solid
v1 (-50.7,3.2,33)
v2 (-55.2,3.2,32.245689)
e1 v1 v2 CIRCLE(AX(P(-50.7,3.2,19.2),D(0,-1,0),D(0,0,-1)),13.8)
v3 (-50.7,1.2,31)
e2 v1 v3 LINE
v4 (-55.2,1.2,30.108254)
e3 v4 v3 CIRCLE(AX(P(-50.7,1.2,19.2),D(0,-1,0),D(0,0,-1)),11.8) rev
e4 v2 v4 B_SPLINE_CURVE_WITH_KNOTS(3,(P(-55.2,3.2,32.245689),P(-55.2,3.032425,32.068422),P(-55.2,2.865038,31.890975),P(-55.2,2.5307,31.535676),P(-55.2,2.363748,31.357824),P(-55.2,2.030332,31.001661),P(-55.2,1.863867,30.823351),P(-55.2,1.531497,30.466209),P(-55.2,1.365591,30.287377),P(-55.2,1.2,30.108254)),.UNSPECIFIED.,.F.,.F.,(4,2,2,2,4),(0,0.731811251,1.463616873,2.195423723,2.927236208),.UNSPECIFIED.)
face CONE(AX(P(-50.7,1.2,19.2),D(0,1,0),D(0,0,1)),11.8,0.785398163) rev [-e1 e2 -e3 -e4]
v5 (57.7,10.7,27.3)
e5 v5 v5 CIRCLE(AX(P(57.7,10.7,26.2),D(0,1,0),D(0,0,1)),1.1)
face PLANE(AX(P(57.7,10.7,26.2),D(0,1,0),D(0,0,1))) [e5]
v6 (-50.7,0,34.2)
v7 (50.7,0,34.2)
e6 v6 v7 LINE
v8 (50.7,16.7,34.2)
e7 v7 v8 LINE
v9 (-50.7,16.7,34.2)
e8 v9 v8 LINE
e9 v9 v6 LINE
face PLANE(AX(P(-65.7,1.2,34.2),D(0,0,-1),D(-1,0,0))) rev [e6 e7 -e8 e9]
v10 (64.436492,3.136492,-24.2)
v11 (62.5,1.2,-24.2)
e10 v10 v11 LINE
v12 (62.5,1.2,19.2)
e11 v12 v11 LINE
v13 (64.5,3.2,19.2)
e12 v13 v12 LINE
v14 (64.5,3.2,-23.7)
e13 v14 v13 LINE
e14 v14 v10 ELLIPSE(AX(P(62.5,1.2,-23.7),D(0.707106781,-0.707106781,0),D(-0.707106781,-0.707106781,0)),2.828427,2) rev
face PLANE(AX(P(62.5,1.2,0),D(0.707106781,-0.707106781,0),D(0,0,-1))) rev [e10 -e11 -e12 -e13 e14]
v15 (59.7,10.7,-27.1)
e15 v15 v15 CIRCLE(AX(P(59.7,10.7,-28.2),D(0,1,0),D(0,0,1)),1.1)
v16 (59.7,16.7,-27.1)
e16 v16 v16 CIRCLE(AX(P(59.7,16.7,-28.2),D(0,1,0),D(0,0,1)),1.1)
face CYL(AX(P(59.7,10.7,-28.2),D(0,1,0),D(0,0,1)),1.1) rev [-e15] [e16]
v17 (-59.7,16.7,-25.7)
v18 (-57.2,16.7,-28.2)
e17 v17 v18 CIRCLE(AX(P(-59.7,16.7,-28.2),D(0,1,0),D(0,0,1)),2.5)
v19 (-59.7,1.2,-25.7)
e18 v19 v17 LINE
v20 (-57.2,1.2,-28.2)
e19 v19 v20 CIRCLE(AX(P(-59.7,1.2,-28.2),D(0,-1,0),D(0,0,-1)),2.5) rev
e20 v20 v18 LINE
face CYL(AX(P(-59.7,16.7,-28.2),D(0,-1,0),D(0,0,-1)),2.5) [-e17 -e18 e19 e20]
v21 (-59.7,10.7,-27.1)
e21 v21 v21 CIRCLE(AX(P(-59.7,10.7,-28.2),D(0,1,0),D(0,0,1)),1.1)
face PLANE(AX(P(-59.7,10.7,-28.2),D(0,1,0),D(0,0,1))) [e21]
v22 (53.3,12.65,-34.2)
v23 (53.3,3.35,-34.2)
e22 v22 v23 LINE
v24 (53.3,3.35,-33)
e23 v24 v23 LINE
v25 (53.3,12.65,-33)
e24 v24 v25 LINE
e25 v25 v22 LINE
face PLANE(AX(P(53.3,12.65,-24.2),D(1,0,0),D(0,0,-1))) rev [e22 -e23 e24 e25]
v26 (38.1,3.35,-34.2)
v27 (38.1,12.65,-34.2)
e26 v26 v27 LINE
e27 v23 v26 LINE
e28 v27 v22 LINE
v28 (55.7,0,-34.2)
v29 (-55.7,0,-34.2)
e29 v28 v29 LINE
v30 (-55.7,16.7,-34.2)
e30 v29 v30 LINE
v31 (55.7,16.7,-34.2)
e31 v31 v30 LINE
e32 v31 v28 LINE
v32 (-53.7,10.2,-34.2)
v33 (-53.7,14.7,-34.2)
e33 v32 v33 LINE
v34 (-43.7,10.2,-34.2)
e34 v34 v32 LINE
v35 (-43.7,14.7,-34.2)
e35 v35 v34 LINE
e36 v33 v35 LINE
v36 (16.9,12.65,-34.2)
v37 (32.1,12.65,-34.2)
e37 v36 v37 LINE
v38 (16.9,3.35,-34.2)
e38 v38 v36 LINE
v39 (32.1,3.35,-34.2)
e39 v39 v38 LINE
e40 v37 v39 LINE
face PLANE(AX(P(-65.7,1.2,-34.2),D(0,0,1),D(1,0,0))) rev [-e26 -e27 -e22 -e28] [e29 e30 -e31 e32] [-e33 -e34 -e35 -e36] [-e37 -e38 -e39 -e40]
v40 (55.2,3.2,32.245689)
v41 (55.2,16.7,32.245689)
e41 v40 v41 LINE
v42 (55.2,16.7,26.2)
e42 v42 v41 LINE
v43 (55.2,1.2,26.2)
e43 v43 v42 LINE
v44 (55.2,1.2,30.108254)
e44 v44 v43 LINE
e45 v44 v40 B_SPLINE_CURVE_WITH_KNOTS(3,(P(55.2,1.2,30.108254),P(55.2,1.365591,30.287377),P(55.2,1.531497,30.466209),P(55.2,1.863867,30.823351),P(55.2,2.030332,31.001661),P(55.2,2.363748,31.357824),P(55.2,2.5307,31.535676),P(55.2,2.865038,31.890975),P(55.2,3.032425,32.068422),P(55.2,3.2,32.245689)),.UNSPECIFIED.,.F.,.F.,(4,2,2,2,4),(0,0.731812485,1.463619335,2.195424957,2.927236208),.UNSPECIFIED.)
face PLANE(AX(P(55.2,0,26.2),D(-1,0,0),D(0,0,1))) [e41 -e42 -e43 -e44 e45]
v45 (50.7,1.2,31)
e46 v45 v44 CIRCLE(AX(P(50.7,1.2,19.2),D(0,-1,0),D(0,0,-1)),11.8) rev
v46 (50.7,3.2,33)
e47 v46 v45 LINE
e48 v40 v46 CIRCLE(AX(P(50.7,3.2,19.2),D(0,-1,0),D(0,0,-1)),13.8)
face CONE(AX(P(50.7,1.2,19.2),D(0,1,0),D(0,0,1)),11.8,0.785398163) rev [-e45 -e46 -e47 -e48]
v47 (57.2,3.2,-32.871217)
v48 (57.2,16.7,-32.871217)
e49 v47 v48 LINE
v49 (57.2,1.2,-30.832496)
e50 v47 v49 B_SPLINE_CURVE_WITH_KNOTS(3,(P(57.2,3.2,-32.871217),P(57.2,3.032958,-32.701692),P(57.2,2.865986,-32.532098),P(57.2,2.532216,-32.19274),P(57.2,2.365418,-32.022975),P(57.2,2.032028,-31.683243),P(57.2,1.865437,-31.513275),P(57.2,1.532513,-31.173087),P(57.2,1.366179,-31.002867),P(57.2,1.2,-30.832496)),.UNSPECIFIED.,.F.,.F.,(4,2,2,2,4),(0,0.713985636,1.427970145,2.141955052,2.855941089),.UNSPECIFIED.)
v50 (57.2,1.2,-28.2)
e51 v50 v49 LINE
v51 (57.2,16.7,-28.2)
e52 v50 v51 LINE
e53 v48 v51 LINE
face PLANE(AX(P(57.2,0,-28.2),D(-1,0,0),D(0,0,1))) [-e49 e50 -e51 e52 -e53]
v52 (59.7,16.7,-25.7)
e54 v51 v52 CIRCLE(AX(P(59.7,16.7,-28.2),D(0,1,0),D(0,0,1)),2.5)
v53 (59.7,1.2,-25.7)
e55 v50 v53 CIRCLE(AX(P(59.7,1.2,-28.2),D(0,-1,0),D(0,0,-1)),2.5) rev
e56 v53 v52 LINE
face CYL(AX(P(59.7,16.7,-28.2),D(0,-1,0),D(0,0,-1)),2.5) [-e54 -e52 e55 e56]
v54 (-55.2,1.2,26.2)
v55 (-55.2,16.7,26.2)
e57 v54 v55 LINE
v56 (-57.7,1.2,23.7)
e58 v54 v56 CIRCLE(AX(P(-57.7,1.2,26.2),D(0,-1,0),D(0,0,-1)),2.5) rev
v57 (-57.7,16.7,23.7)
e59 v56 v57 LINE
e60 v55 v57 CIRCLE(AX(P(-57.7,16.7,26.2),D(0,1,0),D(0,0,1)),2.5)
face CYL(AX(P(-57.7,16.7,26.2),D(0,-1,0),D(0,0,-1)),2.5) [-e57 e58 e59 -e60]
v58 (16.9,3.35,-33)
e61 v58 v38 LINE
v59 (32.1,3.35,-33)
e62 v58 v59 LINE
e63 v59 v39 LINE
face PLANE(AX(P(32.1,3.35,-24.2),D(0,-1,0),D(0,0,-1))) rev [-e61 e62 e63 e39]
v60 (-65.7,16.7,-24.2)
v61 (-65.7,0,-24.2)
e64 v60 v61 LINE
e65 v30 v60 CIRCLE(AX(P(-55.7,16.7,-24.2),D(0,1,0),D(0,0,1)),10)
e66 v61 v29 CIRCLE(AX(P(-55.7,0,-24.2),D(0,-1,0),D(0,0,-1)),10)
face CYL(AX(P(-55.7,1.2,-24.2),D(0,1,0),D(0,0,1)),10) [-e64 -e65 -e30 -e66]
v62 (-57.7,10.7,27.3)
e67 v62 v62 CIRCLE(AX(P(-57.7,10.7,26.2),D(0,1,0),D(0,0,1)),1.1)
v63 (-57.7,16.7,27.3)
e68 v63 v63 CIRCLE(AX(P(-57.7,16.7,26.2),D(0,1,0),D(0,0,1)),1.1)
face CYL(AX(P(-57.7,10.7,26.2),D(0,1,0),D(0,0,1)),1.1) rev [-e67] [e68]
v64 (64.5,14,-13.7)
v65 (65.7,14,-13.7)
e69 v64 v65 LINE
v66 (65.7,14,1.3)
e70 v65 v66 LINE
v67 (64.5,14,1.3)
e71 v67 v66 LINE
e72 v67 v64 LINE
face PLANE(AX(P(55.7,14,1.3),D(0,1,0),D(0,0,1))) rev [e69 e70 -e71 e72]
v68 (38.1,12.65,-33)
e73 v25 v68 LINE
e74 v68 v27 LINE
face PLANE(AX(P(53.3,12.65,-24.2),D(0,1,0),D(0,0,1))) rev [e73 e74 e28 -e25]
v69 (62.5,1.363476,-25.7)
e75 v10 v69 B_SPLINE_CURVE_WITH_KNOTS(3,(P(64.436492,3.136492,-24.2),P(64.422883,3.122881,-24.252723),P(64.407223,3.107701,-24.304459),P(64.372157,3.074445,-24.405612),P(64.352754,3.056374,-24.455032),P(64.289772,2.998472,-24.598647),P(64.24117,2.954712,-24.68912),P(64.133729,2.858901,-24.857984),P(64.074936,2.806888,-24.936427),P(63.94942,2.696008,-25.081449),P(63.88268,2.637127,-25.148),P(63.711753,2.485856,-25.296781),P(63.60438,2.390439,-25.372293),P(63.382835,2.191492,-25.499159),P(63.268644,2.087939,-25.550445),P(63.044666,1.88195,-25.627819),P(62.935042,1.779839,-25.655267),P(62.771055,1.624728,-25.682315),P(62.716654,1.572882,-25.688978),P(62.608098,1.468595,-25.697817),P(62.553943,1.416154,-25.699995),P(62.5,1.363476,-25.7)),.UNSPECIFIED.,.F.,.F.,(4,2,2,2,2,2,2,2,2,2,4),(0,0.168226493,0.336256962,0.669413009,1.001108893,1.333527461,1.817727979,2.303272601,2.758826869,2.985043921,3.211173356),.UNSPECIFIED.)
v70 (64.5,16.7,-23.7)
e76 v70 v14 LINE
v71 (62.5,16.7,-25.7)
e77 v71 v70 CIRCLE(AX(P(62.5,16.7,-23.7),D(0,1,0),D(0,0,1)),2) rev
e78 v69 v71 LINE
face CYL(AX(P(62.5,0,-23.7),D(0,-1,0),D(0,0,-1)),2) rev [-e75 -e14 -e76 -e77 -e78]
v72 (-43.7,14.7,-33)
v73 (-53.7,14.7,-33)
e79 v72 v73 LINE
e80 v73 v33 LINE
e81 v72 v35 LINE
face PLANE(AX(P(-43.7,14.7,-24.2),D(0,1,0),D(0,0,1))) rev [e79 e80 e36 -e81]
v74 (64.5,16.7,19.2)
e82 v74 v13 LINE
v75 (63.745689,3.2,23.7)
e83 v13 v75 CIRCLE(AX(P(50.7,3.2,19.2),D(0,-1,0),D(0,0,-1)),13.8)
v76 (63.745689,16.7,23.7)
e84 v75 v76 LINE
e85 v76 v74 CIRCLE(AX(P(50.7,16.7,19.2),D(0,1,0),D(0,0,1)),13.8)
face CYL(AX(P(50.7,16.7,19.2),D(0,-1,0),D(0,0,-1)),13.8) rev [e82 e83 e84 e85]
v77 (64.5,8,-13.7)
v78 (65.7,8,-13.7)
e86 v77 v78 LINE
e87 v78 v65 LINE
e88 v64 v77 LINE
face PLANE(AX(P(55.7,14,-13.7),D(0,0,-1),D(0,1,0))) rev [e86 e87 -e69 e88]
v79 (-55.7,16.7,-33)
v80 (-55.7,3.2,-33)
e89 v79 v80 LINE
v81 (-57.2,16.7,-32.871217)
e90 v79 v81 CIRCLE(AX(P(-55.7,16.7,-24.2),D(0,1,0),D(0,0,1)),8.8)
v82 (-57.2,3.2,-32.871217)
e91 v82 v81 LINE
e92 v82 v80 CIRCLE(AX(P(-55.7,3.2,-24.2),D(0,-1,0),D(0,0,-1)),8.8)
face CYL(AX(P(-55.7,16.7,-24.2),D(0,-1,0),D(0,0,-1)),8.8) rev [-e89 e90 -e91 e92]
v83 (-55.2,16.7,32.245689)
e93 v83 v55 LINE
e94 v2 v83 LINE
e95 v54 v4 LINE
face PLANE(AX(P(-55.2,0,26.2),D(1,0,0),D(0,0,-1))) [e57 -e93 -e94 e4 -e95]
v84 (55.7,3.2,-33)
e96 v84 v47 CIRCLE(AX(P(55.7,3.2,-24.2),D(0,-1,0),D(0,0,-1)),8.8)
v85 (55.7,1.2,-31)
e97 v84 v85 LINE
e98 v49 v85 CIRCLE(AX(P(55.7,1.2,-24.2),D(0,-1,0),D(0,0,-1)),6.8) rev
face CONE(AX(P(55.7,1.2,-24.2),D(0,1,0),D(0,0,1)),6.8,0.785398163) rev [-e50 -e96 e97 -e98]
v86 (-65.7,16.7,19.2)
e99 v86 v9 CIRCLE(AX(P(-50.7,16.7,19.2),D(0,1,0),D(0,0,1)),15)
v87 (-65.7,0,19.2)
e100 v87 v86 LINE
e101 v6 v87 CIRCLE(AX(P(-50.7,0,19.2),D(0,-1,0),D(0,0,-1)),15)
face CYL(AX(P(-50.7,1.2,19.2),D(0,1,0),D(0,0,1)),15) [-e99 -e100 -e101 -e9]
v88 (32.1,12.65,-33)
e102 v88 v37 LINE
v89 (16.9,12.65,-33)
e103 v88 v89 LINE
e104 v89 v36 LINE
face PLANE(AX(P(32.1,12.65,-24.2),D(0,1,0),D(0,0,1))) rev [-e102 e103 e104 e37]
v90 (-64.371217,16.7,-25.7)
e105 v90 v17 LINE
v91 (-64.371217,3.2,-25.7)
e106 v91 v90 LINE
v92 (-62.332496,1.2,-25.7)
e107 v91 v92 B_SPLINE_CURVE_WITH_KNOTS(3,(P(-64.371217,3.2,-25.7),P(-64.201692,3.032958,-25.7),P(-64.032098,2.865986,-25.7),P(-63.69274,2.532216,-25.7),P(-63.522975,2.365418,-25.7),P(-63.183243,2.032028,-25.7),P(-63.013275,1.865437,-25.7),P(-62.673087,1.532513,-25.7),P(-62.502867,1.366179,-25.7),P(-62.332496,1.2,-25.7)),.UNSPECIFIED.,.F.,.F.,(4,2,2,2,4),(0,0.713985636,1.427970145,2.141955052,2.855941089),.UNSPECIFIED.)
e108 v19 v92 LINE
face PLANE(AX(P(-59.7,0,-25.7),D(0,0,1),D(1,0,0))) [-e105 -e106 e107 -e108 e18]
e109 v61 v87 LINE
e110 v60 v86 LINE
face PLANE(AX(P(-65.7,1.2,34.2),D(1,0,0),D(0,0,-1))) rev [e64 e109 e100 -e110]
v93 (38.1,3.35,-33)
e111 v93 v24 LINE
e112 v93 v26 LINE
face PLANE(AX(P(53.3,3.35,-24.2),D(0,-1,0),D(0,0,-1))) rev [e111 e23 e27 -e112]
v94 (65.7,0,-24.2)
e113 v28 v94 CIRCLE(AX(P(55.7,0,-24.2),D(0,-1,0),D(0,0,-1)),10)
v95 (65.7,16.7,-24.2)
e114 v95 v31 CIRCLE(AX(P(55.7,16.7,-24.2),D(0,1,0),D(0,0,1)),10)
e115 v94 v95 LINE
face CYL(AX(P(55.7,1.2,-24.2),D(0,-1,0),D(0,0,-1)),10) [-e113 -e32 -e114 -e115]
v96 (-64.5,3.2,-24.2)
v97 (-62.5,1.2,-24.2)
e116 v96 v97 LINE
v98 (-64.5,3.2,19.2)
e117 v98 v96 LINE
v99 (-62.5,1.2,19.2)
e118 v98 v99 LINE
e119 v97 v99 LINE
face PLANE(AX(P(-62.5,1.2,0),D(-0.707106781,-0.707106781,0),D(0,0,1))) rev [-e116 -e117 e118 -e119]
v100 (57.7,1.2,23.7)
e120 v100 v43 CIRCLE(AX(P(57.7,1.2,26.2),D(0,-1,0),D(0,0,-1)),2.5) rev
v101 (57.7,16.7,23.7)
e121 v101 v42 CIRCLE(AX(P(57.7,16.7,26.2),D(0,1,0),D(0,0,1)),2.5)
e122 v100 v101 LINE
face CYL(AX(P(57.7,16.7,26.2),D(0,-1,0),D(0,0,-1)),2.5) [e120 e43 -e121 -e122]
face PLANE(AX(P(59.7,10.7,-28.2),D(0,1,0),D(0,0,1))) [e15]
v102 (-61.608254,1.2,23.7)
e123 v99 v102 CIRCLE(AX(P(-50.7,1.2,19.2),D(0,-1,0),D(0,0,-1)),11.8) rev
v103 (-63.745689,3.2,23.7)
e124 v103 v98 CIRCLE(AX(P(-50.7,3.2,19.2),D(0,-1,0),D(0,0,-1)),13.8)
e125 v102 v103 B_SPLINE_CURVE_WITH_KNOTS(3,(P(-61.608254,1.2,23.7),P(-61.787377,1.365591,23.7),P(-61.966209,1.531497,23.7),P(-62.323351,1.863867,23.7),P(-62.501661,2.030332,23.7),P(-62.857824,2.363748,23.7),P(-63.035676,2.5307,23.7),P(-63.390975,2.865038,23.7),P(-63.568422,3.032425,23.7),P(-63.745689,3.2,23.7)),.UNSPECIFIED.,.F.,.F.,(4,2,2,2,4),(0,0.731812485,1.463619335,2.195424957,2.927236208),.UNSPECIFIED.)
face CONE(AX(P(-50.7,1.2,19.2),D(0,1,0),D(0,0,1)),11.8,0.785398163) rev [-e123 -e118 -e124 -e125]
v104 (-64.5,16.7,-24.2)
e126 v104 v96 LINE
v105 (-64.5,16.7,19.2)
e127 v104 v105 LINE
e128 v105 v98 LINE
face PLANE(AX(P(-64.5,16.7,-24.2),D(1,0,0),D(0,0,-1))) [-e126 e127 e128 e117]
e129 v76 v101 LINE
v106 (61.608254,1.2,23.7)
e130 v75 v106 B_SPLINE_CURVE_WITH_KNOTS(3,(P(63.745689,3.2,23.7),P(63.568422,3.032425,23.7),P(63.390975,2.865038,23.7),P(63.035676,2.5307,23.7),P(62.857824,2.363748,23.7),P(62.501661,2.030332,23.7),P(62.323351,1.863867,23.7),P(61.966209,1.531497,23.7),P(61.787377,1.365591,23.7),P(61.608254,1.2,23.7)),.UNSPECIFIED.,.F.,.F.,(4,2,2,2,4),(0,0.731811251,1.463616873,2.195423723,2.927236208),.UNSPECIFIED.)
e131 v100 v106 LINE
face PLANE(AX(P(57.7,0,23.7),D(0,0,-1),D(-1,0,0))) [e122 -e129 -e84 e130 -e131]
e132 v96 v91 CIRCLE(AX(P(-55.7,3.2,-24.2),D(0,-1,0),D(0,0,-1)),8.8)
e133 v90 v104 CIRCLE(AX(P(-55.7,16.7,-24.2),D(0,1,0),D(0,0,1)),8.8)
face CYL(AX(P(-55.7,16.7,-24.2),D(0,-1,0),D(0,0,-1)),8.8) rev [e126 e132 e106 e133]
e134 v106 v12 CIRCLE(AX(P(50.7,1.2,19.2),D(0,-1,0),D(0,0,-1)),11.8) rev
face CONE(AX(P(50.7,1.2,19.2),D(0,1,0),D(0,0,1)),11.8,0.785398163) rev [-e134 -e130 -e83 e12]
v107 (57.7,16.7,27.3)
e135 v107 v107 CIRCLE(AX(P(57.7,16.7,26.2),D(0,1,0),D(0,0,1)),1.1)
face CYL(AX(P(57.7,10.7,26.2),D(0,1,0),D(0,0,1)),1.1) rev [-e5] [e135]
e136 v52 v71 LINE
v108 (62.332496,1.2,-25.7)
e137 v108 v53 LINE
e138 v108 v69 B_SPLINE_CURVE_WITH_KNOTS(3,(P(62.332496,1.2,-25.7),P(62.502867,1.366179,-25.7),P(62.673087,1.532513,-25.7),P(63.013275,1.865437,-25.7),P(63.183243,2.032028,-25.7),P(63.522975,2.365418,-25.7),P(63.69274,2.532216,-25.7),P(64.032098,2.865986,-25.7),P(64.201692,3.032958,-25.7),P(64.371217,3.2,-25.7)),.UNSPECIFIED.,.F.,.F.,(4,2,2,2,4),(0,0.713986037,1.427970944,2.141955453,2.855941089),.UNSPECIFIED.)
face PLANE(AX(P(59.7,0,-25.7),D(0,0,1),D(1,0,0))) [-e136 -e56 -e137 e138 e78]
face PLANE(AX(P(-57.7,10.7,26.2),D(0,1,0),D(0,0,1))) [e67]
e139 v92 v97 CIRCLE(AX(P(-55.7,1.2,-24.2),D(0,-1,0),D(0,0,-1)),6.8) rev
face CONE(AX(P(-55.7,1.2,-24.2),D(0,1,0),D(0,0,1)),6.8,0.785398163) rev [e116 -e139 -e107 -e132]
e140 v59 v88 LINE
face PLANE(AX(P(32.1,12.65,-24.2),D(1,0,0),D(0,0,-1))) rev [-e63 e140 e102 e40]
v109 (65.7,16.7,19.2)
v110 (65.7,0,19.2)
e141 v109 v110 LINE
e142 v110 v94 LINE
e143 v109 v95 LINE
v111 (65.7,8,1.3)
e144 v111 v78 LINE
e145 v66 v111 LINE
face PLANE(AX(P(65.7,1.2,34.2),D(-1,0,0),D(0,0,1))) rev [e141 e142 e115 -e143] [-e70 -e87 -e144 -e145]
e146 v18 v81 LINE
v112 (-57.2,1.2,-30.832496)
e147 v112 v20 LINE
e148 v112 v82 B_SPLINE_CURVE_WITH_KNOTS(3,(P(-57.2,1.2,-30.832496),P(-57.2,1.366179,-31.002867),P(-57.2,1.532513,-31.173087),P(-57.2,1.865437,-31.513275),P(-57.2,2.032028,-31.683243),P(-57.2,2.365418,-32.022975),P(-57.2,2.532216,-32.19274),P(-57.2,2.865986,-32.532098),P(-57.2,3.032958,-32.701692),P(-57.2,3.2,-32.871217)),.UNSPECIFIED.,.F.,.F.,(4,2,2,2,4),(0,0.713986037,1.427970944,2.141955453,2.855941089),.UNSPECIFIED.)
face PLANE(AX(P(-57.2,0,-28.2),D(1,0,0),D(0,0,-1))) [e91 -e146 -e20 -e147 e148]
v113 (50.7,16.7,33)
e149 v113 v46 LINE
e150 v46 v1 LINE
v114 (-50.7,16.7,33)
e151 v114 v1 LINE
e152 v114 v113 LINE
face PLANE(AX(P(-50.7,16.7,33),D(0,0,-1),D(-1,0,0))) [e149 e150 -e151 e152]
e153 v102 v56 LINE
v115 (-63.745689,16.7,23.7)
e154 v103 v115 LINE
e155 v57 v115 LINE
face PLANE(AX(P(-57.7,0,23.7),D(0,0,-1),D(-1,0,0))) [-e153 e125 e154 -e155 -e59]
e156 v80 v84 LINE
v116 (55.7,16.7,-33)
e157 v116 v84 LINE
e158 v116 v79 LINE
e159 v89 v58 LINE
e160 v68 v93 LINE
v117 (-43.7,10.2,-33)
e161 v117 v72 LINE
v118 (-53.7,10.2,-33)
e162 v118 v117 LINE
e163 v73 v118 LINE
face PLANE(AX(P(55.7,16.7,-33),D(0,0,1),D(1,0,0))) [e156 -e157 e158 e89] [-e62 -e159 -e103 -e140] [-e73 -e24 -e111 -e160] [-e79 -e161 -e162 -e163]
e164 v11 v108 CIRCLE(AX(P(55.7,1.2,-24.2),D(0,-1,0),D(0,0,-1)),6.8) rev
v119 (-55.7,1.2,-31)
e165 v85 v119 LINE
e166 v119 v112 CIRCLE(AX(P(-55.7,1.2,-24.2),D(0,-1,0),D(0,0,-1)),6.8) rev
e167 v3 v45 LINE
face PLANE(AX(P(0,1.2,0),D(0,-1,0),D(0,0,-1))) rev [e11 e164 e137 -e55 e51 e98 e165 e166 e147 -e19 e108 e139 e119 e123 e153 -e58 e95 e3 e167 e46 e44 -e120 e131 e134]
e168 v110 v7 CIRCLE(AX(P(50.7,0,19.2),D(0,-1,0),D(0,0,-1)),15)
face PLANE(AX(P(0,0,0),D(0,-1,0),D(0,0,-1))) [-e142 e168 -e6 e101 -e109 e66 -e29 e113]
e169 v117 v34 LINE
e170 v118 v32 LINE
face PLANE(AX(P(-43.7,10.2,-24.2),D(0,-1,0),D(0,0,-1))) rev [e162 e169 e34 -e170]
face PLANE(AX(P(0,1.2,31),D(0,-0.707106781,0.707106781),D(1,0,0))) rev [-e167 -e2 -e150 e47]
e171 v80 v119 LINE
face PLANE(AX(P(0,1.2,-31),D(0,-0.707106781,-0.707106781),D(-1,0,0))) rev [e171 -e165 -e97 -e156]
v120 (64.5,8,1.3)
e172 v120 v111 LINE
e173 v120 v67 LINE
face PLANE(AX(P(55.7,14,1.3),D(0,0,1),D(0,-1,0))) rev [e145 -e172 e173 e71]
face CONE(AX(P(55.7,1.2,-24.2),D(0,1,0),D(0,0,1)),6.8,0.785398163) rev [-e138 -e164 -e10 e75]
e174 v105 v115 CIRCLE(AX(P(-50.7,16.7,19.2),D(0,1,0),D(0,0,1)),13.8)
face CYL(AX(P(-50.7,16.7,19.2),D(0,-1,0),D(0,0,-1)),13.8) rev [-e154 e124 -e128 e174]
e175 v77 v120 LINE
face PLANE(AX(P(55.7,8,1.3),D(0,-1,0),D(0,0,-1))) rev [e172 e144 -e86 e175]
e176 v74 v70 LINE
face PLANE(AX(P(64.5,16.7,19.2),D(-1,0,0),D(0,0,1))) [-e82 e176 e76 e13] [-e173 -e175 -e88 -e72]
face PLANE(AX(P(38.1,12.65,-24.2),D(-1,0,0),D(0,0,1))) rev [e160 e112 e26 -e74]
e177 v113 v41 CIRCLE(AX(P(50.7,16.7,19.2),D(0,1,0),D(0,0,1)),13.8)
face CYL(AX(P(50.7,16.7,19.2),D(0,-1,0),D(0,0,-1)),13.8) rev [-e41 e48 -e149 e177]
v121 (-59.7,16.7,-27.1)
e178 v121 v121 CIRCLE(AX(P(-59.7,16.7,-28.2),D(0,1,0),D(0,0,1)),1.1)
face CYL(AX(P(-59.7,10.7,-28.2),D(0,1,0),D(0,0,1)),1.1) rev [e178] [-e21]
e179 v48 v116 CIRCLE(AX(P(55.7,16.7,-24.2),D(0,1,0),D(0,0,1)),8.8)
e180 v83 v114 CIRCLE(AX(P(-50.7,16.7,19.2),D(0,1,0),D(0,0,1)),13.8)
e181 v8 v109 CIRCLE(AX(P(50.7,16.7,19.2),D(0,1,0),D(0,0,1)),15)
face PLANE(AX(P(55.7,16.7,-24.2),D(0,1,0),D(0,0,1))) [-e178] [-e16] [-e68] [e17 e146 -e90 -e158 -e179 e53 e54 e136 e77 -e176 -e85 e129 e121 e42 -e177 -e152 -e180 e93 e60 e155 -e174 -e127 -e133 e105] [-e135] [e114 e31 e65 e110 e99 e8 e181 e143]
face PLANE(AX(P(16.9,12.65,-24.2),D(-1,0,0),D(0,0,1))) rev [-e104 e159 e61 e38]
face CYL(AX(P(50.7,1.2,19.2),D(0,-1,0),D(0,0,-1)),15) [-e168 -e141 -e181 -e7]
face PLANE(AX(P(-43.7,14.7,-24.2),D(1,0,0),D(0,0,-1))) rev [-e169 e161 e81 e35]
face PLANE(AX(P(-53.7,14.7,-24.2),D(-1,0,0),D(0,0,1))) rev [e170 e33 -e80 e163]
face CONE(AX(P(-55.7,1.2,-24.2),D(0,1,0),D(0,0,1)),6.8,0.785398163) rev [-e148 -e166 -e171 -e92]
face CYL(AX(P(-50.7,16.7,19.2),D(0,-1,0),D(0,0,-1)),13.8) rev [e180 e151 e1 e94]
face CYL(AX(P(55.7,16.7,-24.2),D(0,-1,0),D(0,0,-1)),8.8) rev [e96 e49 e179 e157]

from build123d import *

# Parameters (mm, degrees)
ESBO_O1_W                   = 131.4
ESBO_O1_H                   = 68.4
BASE_DEPTH                  = 1.2
FILETE1_R                   = 15
FILETE2_R                   = 15
FILETE3_R                   = 10
FILETE4_R                   = 10
PAREDES_START               = 15.5
PAREDES_DEPTH               = 15.5
ESBO_O6_R                   = 2.5
SUPORTE_DOS_PARAFUSOS_DEPTH = 15.5
ESBO_O7_R                   = 1.1
FURO_DOS_PARAFUSOS_DEPTH    = 6
FECHAMENTOS_REACH           = 77.928
ESBO_O14_W                  = 10
ESBO_O14_H                  = 4.5
CORTE_DO_USB_DEPTH          = 10
ESBO_O16_W                  = 15.2
ESBO_O16_H                  = 9.3
CORTE_DAS_CHAVES_DEPTH      = 10
ESBO_O17_W                  = 15
ESBO_O17_H                  = 6
CORTE_SD_DEPTH              = 10
CHANFRO_BASE_INTERIOR_SIZE  = 2
FILETE5_R                   = 2


with BuildPart() as part:
    # Esboço1 → Base (new body)
    with BuildSketch(Plane(origin=(0, 0, 0), x_dir=(1, 0, 0), z_dir=(0, 1, 0))):
        Rectangle(ESBO_O1_W, ESBO_O1_H)
    extrude(amount=BASE_DEPTH)

    # Filete1
    filete1_edges = [part.edges().sort_by_distance(p)[0] for p in [
        (65.7, 0.6, 34.2),
    ]]
    fillet(filete1_edges, radius=FILETE1_R)

    # Filete2
    filete2_edges = [part.edges().sort_by_distance(p)[0] for p in [
        (-65.7, 0.6, 34.2),
    ]]
    fillet(filete2_edges, radius=FILETE2_R)

    # Filete3
    filete3_edges = [part.edges().sort_by_distance(p)[0] for p in [
        (65.7, 0.6, -34.2),
    ]]
    fillet(filete3_edges, radius=FILETE3_R)

    # Filete4
    filete4_edges = [part.edges().sort_by_distance(p)[0] for p in [
        (-65.7, 0.6, -34.2),
    ]]
    fillet(filete4_edges, radius=FILETE4_R)

    # Esboço5 → Paredes (add)
    with BuildSketch(Plane(origin=(0, 1.2, 0), x_dir=(1, 0, 0), z_dir=(0, 1, 0)).offset(PAREDES_START)):
        with BuildLine():
            Line((55.7, 34.2), (-55.7, 34.2))
            ThreePointArc((-55.7, 34.2), (-62.771067812, 31.271067812), (-65.7, 24.2))
            Line((-65.7, 24.2), (-65.7, -19.2))
            ThreePointArc((-65.7, -19.2), (-61.306601718, -29.806601718), (-50.7, -34.2))
            Line((-50.7, -34.2), (50.7, -34.2))
            ThreePointArc((50.7, -34.2), (61.306601718, -29.806601718), (65.7, -19.2))
            Line((65.7, -19.2), (65.7, 24.2))
            ThreePointArc((65.7, 24.2), (62.771067812, 31.271067812), (55.7, 34.2))
        make_face()
        with BuildLine():
            Line((55.7, 33), (-55.7, 33))
            ThreePointArc((-55.7, 33), (-61.922539674, 30.422539674), (-64.5, 24.2))
            Line((-64.5, 24.2), (-64.5, -19.2))
            ThreePointArc((-64.5, -19.2), (-60.45807358, -28.95807358), (-50.7, -33))
            Line((-50.7, -33), (50.7, -33))
            ThreePointArc((50.7, -33), (60.45807358, -28.95807358), (64.5, -19.2))
            Line((64.5, -19.2), (64.5, 24.2))
            ThreePointArc((64.5, 24.2), (61.922539674, 30.422539674), (55.7, 33))
        make_face(mode=Mode.SUBTRACT)
    extrude(amount=-PAREDES_DEPTH)

    # Esboço6 → Suporte dos parafusos (add)
    with BuildSketch(Plane(origin=(0, 1.2, 0), x_dir=(1, 0, 0), z_dir=(0, 1, 0))):
        with Locations(Location((-59.7, 28.2, 0), (0, 0, 90))):
            Circle(ESBO_O6_R)
        with Locations(Location((-57.7, -26.2, 0), (0, 0, 90))):
            Circle(ESBO_O6_R)
        with Locations(Location((59.7, 28.2, 0), (0, 0, 90))):
            Circle(ESBO_O6_R)
        with Locations(Location((57.7, -26.2, 0), (0, 0, 90))):
            Circle(ESBO_O6_R)
    extrude(amount=SUPORTE_DOS_PARAFUSOS_DEPTH)

    # Esboço7 → Furo dos parafusos (cut)
    with BuildSketch(Plane(origin=(0, 16.7, 0), x_dir=(1, 0, 0), z_dir=(0, 1, 0))):
        with Locations(Location((-59.7, 28.2, 0), (0, 0, 270))):
            Circle(ESBO_O7_R)
        with Locations(Location((59.7, 28.2, 0), (0, 0, 270))):
            Circle(ESBO_O7_R)
        with Locations(Location((57.7, -26.2, 0), (0, 0, 270))):
            Circle(ESBO_O7_R)
        with Locations(Location((-57.7, -26.2, 0), (0, 0, 270))):
            Circle(ESBO_O7_R)
    extrude(amount=-FURO_DOS_PARAFUSOS_DEPTH, mode=Mode.SUBTRACT)

    # Esboço23 → Fechamentos (add, up to next)
    with BuildSketch(Plane(origin=(0, 16.7, 0), x_dir=(1, 0, 0), z_dir=(0, 1, 0)), mode=Mode.PRIVATE) as fechamentos_sk1:
        with BuildLine():
            Line((57.2, 28.2), (57.2, 32.871216754))
            ThreePointArc((57.2, 32.871216754), (61.922539674, 30.422539674), (64.371216754, 25.7))
            Line((64.371216754, 25.7), (59.7, 25.7))
            Line((59.7, 25.7), (62.2, 28.2))
            Line((62.2, 28.2), (59.7, 30.7))
            Line((59.7, 30.7), (57.2, 28.2))
        make_face()
    fechamentos_tool1 = extrude(fechamentos_sk1.sketch, amount=-FECHAMENTOS_REACH, mode=Mode.PRIVATE) - part.part
    # Esboço23 → Fechamentos (add, up to next)
    with BuildSketch(Plane(origin=(0, 16.7, 0), x_dir=(1, 0, 0), z_dir=(0, 1, 0)), mode=Mode.PRIVATE) as fechamentos_sk2:
        with BuildLine():
            Line((-59.7, 25.7), (-64.371216754, 25.7))
            ThreePointArc((-64.371216754, 25.7), (-61.922539674, 30.422539674), (-57.2, 32.871216754))
            Line((-57.2, 32.871216754), (-57.2, 28.2))
            Line((-57.2, 28.2), (-59.7, 30.7))
            Line((-59.7, 30.7), (-62.2, 28.2))
            Line((-62.2, 28.2), (-59.7, 25.7))
        make_face()
    fechamentos_tool2 = extrude(fechamentos_sk2.sketch, amount=-FECHAMENTOS_REACH, mode=Mode.PRIVATE) - part.part
    # Esboço23 → Fechamentos (add, up to next)
    with BuildSketch(Plane(origin=(0, 16.7, 0), x_dir=(1, 0, 0), z_dir=(0, 1, 0)), mode=Mode.PRIVATE) as fechamentos_sk3:
        with BuildLine():
            Line((57.7, -23.7), (63.745688943, -23.7))
            ThreePointArc((63.745688943, -23.7), (60.45807358, -28.95807358), (55.2, -32.245688943))
            Line((55.2, -32.245688943), (55.2, -26.2))
            Line((55.2, -26.2), (57.7, -28.7))
            Line((57.7, -28.7), (60.2, -26.2))
            Line((60.2, -26.2), (57.7, -23.7))
        make_face()
    fechamentos_tool3 = extrude(fechamentos_sk3.sketch, amount=-FECHAMENTOS_REACH, mode=Mode.PRIVATE) - part.part
    # Esboço23 → Fechamentos (add, up to next)
    with BuildSketch(Plane(origin=(0, 16.7, 0), x_dir=(1, 0, 0), z_dir=(0, 1, 0)), mode=Mode.PRIVATE) as fechamentos_sk4:
        with BuildLine():
            Line((-55.2, -26.2), (-55.2, -32.245688943))
            ThreePointArc((-55.2, -32.245688943), (-60.45807358, -28.95807358), (-63.745688943, -23.7))
            Line((-63.745688943, -23.7), (-57.7, -23.7))
            Line((-57.7, -23.7), (-60.2, -26.2))
            Line((-60.2, -26.2), (-57.7, -28.7))
            Line((-57.7, -28.7), (-55.2, -26.2))
        make_face()
    fechamentos_tool4 = extrude(fechamentos_sk4.sketch, amount=-FECHAMENTOS_REACH, mode=Mode.PRIVATE) - part.part
    add(fechamentos_tool1.solids().sort_by_distance((57.301416, 16.7, -30.535608))[0])
    add(fechamentos_tool2.solids().sort_by_distance((-62.035608, 16.7, -25.801416))[0])
    add(fechamentos_tool3.solids().sort_by_distance((59.019684, 16.7, 27.519684))[0])
    add(fechamentos_tool4.solids().sort_by_distance((-59.019684, 16.7, 27.519684))[0])

    # Esboço14 → Corte do USB (cut)
    with BuildSketch(Plane(origin=(0, 0, -34.2), x_dir=(-1, 0, 0), z_dir=(0, 0, -1))):
        with Locations((48.7, 12.45)):
            Rectangle(ESBO_O14_W, ESBO_O14_H)
    extrude(amount=-CORTE_DO_USB_DEPTH, mode=Mode.SUBTRACT)

    # Esboço16 → Corte das chaves (cut)
    with BuildSketch(Plane(origin=(0, 0, -34.2), x_dir=(-1, 0, 0), z_dir=(0, 0, -1))):
        with Locations((-45.7, 8)):
            Rectangle(ESBO_O16_W, ESBO_O16_H)
        with Locations((-24.5, 8)):
            Rectangle(ESBO_O16_W, ESBO_O16_H)
    extrude(amount=-CORTE_DAS_CHAVES_DEPTH, mode=Mode.SUBTRACT)

    # Esboço17 → Corte SD (cut)
    with BuildSketch(Plane(origin=(65.7, 0, 0), x_dir=(0, 0, -1), z_dir=(1, 0, 0))):
        with Locations((6.2, 11)):
            Rectangle(ESBO_O17_W, ESBO_O17_H)
    extrude(amount=-CORTE_SD_DEPTH, mode=Mode.SUBTRACT)

    # Chanfro base interior
    chanfro_base_interior_edges = [part.edges().sort_by_distance(p)[0] for p in [
        (56.452759112, 1.2, -32.967745076),
        (-64.467745076, 1.2, -24.952759112),
        (64.310115859, 1.2, 21.481391306),
        (-52.981391306, 1.2, 32.810115859),
        (64.467745076, 1.2, -24.952759112),
        (0, 1.2, -33),
        (-56.452759112, 1.2, -32.967745076),
        (-64.5, 1.2, -2.5),
        (-64.310115859, 1.2, 21.481391306),
        (0, 1.2, 33),
        (52.981391306, 1.2, 32.810115859),
        (64.5, 1.2, -2.5),
    ]]
    chamfer(chanfro_base_interior_edges, length=CHANFRO_BASE_INTERIOR_SIZE)

    # Filete5
    # the kernel refuses this fillet: 2 mm, written as the material it adds along each edge
    with BuildSketch(Plane(origin=(64.371216754, 16.7, -25.7), x_dir=(0.06425854366242006, 0, 0.9979332841259403), z_dir=(0, -1, 0))) as filete5_piece_1_section:
        with BuildLine():
            CenterArc((1.875624905, 1.995866568), FILETE5_R, 183.684281821, 90)
            Line((-0.120241664, 1.867349481), (-0.31982832, 1.854497772))
            Line((-0.31982832, 1.854497772), (-0.199586657, -0.012851709))
            Line((-0.199586657, -0.012851709), (-0.021356822, -0.198856446))
            ThreePointArc((-0.021356822, -0.198856446), (1.518027059, -0.231715929), (2.016993701, -0.199586657))
            Line((2.016993701, -0.199586657), (2.004141992, 0))
        make_face()
    filete5_piece_1 = extrude(amount=18.51035498, mode=Mode.PRIVATE)
    filete5_piece_1 = split(filete5_piece_1, bisect_by=Plane(origin=(63.917041989, 0, -25.117041989), z_dir=(0, 1, 0)), keep=Keep.TOP, mode=Mode.PRIVATE)
    add(filete5_piece_1)


solid = part.part
